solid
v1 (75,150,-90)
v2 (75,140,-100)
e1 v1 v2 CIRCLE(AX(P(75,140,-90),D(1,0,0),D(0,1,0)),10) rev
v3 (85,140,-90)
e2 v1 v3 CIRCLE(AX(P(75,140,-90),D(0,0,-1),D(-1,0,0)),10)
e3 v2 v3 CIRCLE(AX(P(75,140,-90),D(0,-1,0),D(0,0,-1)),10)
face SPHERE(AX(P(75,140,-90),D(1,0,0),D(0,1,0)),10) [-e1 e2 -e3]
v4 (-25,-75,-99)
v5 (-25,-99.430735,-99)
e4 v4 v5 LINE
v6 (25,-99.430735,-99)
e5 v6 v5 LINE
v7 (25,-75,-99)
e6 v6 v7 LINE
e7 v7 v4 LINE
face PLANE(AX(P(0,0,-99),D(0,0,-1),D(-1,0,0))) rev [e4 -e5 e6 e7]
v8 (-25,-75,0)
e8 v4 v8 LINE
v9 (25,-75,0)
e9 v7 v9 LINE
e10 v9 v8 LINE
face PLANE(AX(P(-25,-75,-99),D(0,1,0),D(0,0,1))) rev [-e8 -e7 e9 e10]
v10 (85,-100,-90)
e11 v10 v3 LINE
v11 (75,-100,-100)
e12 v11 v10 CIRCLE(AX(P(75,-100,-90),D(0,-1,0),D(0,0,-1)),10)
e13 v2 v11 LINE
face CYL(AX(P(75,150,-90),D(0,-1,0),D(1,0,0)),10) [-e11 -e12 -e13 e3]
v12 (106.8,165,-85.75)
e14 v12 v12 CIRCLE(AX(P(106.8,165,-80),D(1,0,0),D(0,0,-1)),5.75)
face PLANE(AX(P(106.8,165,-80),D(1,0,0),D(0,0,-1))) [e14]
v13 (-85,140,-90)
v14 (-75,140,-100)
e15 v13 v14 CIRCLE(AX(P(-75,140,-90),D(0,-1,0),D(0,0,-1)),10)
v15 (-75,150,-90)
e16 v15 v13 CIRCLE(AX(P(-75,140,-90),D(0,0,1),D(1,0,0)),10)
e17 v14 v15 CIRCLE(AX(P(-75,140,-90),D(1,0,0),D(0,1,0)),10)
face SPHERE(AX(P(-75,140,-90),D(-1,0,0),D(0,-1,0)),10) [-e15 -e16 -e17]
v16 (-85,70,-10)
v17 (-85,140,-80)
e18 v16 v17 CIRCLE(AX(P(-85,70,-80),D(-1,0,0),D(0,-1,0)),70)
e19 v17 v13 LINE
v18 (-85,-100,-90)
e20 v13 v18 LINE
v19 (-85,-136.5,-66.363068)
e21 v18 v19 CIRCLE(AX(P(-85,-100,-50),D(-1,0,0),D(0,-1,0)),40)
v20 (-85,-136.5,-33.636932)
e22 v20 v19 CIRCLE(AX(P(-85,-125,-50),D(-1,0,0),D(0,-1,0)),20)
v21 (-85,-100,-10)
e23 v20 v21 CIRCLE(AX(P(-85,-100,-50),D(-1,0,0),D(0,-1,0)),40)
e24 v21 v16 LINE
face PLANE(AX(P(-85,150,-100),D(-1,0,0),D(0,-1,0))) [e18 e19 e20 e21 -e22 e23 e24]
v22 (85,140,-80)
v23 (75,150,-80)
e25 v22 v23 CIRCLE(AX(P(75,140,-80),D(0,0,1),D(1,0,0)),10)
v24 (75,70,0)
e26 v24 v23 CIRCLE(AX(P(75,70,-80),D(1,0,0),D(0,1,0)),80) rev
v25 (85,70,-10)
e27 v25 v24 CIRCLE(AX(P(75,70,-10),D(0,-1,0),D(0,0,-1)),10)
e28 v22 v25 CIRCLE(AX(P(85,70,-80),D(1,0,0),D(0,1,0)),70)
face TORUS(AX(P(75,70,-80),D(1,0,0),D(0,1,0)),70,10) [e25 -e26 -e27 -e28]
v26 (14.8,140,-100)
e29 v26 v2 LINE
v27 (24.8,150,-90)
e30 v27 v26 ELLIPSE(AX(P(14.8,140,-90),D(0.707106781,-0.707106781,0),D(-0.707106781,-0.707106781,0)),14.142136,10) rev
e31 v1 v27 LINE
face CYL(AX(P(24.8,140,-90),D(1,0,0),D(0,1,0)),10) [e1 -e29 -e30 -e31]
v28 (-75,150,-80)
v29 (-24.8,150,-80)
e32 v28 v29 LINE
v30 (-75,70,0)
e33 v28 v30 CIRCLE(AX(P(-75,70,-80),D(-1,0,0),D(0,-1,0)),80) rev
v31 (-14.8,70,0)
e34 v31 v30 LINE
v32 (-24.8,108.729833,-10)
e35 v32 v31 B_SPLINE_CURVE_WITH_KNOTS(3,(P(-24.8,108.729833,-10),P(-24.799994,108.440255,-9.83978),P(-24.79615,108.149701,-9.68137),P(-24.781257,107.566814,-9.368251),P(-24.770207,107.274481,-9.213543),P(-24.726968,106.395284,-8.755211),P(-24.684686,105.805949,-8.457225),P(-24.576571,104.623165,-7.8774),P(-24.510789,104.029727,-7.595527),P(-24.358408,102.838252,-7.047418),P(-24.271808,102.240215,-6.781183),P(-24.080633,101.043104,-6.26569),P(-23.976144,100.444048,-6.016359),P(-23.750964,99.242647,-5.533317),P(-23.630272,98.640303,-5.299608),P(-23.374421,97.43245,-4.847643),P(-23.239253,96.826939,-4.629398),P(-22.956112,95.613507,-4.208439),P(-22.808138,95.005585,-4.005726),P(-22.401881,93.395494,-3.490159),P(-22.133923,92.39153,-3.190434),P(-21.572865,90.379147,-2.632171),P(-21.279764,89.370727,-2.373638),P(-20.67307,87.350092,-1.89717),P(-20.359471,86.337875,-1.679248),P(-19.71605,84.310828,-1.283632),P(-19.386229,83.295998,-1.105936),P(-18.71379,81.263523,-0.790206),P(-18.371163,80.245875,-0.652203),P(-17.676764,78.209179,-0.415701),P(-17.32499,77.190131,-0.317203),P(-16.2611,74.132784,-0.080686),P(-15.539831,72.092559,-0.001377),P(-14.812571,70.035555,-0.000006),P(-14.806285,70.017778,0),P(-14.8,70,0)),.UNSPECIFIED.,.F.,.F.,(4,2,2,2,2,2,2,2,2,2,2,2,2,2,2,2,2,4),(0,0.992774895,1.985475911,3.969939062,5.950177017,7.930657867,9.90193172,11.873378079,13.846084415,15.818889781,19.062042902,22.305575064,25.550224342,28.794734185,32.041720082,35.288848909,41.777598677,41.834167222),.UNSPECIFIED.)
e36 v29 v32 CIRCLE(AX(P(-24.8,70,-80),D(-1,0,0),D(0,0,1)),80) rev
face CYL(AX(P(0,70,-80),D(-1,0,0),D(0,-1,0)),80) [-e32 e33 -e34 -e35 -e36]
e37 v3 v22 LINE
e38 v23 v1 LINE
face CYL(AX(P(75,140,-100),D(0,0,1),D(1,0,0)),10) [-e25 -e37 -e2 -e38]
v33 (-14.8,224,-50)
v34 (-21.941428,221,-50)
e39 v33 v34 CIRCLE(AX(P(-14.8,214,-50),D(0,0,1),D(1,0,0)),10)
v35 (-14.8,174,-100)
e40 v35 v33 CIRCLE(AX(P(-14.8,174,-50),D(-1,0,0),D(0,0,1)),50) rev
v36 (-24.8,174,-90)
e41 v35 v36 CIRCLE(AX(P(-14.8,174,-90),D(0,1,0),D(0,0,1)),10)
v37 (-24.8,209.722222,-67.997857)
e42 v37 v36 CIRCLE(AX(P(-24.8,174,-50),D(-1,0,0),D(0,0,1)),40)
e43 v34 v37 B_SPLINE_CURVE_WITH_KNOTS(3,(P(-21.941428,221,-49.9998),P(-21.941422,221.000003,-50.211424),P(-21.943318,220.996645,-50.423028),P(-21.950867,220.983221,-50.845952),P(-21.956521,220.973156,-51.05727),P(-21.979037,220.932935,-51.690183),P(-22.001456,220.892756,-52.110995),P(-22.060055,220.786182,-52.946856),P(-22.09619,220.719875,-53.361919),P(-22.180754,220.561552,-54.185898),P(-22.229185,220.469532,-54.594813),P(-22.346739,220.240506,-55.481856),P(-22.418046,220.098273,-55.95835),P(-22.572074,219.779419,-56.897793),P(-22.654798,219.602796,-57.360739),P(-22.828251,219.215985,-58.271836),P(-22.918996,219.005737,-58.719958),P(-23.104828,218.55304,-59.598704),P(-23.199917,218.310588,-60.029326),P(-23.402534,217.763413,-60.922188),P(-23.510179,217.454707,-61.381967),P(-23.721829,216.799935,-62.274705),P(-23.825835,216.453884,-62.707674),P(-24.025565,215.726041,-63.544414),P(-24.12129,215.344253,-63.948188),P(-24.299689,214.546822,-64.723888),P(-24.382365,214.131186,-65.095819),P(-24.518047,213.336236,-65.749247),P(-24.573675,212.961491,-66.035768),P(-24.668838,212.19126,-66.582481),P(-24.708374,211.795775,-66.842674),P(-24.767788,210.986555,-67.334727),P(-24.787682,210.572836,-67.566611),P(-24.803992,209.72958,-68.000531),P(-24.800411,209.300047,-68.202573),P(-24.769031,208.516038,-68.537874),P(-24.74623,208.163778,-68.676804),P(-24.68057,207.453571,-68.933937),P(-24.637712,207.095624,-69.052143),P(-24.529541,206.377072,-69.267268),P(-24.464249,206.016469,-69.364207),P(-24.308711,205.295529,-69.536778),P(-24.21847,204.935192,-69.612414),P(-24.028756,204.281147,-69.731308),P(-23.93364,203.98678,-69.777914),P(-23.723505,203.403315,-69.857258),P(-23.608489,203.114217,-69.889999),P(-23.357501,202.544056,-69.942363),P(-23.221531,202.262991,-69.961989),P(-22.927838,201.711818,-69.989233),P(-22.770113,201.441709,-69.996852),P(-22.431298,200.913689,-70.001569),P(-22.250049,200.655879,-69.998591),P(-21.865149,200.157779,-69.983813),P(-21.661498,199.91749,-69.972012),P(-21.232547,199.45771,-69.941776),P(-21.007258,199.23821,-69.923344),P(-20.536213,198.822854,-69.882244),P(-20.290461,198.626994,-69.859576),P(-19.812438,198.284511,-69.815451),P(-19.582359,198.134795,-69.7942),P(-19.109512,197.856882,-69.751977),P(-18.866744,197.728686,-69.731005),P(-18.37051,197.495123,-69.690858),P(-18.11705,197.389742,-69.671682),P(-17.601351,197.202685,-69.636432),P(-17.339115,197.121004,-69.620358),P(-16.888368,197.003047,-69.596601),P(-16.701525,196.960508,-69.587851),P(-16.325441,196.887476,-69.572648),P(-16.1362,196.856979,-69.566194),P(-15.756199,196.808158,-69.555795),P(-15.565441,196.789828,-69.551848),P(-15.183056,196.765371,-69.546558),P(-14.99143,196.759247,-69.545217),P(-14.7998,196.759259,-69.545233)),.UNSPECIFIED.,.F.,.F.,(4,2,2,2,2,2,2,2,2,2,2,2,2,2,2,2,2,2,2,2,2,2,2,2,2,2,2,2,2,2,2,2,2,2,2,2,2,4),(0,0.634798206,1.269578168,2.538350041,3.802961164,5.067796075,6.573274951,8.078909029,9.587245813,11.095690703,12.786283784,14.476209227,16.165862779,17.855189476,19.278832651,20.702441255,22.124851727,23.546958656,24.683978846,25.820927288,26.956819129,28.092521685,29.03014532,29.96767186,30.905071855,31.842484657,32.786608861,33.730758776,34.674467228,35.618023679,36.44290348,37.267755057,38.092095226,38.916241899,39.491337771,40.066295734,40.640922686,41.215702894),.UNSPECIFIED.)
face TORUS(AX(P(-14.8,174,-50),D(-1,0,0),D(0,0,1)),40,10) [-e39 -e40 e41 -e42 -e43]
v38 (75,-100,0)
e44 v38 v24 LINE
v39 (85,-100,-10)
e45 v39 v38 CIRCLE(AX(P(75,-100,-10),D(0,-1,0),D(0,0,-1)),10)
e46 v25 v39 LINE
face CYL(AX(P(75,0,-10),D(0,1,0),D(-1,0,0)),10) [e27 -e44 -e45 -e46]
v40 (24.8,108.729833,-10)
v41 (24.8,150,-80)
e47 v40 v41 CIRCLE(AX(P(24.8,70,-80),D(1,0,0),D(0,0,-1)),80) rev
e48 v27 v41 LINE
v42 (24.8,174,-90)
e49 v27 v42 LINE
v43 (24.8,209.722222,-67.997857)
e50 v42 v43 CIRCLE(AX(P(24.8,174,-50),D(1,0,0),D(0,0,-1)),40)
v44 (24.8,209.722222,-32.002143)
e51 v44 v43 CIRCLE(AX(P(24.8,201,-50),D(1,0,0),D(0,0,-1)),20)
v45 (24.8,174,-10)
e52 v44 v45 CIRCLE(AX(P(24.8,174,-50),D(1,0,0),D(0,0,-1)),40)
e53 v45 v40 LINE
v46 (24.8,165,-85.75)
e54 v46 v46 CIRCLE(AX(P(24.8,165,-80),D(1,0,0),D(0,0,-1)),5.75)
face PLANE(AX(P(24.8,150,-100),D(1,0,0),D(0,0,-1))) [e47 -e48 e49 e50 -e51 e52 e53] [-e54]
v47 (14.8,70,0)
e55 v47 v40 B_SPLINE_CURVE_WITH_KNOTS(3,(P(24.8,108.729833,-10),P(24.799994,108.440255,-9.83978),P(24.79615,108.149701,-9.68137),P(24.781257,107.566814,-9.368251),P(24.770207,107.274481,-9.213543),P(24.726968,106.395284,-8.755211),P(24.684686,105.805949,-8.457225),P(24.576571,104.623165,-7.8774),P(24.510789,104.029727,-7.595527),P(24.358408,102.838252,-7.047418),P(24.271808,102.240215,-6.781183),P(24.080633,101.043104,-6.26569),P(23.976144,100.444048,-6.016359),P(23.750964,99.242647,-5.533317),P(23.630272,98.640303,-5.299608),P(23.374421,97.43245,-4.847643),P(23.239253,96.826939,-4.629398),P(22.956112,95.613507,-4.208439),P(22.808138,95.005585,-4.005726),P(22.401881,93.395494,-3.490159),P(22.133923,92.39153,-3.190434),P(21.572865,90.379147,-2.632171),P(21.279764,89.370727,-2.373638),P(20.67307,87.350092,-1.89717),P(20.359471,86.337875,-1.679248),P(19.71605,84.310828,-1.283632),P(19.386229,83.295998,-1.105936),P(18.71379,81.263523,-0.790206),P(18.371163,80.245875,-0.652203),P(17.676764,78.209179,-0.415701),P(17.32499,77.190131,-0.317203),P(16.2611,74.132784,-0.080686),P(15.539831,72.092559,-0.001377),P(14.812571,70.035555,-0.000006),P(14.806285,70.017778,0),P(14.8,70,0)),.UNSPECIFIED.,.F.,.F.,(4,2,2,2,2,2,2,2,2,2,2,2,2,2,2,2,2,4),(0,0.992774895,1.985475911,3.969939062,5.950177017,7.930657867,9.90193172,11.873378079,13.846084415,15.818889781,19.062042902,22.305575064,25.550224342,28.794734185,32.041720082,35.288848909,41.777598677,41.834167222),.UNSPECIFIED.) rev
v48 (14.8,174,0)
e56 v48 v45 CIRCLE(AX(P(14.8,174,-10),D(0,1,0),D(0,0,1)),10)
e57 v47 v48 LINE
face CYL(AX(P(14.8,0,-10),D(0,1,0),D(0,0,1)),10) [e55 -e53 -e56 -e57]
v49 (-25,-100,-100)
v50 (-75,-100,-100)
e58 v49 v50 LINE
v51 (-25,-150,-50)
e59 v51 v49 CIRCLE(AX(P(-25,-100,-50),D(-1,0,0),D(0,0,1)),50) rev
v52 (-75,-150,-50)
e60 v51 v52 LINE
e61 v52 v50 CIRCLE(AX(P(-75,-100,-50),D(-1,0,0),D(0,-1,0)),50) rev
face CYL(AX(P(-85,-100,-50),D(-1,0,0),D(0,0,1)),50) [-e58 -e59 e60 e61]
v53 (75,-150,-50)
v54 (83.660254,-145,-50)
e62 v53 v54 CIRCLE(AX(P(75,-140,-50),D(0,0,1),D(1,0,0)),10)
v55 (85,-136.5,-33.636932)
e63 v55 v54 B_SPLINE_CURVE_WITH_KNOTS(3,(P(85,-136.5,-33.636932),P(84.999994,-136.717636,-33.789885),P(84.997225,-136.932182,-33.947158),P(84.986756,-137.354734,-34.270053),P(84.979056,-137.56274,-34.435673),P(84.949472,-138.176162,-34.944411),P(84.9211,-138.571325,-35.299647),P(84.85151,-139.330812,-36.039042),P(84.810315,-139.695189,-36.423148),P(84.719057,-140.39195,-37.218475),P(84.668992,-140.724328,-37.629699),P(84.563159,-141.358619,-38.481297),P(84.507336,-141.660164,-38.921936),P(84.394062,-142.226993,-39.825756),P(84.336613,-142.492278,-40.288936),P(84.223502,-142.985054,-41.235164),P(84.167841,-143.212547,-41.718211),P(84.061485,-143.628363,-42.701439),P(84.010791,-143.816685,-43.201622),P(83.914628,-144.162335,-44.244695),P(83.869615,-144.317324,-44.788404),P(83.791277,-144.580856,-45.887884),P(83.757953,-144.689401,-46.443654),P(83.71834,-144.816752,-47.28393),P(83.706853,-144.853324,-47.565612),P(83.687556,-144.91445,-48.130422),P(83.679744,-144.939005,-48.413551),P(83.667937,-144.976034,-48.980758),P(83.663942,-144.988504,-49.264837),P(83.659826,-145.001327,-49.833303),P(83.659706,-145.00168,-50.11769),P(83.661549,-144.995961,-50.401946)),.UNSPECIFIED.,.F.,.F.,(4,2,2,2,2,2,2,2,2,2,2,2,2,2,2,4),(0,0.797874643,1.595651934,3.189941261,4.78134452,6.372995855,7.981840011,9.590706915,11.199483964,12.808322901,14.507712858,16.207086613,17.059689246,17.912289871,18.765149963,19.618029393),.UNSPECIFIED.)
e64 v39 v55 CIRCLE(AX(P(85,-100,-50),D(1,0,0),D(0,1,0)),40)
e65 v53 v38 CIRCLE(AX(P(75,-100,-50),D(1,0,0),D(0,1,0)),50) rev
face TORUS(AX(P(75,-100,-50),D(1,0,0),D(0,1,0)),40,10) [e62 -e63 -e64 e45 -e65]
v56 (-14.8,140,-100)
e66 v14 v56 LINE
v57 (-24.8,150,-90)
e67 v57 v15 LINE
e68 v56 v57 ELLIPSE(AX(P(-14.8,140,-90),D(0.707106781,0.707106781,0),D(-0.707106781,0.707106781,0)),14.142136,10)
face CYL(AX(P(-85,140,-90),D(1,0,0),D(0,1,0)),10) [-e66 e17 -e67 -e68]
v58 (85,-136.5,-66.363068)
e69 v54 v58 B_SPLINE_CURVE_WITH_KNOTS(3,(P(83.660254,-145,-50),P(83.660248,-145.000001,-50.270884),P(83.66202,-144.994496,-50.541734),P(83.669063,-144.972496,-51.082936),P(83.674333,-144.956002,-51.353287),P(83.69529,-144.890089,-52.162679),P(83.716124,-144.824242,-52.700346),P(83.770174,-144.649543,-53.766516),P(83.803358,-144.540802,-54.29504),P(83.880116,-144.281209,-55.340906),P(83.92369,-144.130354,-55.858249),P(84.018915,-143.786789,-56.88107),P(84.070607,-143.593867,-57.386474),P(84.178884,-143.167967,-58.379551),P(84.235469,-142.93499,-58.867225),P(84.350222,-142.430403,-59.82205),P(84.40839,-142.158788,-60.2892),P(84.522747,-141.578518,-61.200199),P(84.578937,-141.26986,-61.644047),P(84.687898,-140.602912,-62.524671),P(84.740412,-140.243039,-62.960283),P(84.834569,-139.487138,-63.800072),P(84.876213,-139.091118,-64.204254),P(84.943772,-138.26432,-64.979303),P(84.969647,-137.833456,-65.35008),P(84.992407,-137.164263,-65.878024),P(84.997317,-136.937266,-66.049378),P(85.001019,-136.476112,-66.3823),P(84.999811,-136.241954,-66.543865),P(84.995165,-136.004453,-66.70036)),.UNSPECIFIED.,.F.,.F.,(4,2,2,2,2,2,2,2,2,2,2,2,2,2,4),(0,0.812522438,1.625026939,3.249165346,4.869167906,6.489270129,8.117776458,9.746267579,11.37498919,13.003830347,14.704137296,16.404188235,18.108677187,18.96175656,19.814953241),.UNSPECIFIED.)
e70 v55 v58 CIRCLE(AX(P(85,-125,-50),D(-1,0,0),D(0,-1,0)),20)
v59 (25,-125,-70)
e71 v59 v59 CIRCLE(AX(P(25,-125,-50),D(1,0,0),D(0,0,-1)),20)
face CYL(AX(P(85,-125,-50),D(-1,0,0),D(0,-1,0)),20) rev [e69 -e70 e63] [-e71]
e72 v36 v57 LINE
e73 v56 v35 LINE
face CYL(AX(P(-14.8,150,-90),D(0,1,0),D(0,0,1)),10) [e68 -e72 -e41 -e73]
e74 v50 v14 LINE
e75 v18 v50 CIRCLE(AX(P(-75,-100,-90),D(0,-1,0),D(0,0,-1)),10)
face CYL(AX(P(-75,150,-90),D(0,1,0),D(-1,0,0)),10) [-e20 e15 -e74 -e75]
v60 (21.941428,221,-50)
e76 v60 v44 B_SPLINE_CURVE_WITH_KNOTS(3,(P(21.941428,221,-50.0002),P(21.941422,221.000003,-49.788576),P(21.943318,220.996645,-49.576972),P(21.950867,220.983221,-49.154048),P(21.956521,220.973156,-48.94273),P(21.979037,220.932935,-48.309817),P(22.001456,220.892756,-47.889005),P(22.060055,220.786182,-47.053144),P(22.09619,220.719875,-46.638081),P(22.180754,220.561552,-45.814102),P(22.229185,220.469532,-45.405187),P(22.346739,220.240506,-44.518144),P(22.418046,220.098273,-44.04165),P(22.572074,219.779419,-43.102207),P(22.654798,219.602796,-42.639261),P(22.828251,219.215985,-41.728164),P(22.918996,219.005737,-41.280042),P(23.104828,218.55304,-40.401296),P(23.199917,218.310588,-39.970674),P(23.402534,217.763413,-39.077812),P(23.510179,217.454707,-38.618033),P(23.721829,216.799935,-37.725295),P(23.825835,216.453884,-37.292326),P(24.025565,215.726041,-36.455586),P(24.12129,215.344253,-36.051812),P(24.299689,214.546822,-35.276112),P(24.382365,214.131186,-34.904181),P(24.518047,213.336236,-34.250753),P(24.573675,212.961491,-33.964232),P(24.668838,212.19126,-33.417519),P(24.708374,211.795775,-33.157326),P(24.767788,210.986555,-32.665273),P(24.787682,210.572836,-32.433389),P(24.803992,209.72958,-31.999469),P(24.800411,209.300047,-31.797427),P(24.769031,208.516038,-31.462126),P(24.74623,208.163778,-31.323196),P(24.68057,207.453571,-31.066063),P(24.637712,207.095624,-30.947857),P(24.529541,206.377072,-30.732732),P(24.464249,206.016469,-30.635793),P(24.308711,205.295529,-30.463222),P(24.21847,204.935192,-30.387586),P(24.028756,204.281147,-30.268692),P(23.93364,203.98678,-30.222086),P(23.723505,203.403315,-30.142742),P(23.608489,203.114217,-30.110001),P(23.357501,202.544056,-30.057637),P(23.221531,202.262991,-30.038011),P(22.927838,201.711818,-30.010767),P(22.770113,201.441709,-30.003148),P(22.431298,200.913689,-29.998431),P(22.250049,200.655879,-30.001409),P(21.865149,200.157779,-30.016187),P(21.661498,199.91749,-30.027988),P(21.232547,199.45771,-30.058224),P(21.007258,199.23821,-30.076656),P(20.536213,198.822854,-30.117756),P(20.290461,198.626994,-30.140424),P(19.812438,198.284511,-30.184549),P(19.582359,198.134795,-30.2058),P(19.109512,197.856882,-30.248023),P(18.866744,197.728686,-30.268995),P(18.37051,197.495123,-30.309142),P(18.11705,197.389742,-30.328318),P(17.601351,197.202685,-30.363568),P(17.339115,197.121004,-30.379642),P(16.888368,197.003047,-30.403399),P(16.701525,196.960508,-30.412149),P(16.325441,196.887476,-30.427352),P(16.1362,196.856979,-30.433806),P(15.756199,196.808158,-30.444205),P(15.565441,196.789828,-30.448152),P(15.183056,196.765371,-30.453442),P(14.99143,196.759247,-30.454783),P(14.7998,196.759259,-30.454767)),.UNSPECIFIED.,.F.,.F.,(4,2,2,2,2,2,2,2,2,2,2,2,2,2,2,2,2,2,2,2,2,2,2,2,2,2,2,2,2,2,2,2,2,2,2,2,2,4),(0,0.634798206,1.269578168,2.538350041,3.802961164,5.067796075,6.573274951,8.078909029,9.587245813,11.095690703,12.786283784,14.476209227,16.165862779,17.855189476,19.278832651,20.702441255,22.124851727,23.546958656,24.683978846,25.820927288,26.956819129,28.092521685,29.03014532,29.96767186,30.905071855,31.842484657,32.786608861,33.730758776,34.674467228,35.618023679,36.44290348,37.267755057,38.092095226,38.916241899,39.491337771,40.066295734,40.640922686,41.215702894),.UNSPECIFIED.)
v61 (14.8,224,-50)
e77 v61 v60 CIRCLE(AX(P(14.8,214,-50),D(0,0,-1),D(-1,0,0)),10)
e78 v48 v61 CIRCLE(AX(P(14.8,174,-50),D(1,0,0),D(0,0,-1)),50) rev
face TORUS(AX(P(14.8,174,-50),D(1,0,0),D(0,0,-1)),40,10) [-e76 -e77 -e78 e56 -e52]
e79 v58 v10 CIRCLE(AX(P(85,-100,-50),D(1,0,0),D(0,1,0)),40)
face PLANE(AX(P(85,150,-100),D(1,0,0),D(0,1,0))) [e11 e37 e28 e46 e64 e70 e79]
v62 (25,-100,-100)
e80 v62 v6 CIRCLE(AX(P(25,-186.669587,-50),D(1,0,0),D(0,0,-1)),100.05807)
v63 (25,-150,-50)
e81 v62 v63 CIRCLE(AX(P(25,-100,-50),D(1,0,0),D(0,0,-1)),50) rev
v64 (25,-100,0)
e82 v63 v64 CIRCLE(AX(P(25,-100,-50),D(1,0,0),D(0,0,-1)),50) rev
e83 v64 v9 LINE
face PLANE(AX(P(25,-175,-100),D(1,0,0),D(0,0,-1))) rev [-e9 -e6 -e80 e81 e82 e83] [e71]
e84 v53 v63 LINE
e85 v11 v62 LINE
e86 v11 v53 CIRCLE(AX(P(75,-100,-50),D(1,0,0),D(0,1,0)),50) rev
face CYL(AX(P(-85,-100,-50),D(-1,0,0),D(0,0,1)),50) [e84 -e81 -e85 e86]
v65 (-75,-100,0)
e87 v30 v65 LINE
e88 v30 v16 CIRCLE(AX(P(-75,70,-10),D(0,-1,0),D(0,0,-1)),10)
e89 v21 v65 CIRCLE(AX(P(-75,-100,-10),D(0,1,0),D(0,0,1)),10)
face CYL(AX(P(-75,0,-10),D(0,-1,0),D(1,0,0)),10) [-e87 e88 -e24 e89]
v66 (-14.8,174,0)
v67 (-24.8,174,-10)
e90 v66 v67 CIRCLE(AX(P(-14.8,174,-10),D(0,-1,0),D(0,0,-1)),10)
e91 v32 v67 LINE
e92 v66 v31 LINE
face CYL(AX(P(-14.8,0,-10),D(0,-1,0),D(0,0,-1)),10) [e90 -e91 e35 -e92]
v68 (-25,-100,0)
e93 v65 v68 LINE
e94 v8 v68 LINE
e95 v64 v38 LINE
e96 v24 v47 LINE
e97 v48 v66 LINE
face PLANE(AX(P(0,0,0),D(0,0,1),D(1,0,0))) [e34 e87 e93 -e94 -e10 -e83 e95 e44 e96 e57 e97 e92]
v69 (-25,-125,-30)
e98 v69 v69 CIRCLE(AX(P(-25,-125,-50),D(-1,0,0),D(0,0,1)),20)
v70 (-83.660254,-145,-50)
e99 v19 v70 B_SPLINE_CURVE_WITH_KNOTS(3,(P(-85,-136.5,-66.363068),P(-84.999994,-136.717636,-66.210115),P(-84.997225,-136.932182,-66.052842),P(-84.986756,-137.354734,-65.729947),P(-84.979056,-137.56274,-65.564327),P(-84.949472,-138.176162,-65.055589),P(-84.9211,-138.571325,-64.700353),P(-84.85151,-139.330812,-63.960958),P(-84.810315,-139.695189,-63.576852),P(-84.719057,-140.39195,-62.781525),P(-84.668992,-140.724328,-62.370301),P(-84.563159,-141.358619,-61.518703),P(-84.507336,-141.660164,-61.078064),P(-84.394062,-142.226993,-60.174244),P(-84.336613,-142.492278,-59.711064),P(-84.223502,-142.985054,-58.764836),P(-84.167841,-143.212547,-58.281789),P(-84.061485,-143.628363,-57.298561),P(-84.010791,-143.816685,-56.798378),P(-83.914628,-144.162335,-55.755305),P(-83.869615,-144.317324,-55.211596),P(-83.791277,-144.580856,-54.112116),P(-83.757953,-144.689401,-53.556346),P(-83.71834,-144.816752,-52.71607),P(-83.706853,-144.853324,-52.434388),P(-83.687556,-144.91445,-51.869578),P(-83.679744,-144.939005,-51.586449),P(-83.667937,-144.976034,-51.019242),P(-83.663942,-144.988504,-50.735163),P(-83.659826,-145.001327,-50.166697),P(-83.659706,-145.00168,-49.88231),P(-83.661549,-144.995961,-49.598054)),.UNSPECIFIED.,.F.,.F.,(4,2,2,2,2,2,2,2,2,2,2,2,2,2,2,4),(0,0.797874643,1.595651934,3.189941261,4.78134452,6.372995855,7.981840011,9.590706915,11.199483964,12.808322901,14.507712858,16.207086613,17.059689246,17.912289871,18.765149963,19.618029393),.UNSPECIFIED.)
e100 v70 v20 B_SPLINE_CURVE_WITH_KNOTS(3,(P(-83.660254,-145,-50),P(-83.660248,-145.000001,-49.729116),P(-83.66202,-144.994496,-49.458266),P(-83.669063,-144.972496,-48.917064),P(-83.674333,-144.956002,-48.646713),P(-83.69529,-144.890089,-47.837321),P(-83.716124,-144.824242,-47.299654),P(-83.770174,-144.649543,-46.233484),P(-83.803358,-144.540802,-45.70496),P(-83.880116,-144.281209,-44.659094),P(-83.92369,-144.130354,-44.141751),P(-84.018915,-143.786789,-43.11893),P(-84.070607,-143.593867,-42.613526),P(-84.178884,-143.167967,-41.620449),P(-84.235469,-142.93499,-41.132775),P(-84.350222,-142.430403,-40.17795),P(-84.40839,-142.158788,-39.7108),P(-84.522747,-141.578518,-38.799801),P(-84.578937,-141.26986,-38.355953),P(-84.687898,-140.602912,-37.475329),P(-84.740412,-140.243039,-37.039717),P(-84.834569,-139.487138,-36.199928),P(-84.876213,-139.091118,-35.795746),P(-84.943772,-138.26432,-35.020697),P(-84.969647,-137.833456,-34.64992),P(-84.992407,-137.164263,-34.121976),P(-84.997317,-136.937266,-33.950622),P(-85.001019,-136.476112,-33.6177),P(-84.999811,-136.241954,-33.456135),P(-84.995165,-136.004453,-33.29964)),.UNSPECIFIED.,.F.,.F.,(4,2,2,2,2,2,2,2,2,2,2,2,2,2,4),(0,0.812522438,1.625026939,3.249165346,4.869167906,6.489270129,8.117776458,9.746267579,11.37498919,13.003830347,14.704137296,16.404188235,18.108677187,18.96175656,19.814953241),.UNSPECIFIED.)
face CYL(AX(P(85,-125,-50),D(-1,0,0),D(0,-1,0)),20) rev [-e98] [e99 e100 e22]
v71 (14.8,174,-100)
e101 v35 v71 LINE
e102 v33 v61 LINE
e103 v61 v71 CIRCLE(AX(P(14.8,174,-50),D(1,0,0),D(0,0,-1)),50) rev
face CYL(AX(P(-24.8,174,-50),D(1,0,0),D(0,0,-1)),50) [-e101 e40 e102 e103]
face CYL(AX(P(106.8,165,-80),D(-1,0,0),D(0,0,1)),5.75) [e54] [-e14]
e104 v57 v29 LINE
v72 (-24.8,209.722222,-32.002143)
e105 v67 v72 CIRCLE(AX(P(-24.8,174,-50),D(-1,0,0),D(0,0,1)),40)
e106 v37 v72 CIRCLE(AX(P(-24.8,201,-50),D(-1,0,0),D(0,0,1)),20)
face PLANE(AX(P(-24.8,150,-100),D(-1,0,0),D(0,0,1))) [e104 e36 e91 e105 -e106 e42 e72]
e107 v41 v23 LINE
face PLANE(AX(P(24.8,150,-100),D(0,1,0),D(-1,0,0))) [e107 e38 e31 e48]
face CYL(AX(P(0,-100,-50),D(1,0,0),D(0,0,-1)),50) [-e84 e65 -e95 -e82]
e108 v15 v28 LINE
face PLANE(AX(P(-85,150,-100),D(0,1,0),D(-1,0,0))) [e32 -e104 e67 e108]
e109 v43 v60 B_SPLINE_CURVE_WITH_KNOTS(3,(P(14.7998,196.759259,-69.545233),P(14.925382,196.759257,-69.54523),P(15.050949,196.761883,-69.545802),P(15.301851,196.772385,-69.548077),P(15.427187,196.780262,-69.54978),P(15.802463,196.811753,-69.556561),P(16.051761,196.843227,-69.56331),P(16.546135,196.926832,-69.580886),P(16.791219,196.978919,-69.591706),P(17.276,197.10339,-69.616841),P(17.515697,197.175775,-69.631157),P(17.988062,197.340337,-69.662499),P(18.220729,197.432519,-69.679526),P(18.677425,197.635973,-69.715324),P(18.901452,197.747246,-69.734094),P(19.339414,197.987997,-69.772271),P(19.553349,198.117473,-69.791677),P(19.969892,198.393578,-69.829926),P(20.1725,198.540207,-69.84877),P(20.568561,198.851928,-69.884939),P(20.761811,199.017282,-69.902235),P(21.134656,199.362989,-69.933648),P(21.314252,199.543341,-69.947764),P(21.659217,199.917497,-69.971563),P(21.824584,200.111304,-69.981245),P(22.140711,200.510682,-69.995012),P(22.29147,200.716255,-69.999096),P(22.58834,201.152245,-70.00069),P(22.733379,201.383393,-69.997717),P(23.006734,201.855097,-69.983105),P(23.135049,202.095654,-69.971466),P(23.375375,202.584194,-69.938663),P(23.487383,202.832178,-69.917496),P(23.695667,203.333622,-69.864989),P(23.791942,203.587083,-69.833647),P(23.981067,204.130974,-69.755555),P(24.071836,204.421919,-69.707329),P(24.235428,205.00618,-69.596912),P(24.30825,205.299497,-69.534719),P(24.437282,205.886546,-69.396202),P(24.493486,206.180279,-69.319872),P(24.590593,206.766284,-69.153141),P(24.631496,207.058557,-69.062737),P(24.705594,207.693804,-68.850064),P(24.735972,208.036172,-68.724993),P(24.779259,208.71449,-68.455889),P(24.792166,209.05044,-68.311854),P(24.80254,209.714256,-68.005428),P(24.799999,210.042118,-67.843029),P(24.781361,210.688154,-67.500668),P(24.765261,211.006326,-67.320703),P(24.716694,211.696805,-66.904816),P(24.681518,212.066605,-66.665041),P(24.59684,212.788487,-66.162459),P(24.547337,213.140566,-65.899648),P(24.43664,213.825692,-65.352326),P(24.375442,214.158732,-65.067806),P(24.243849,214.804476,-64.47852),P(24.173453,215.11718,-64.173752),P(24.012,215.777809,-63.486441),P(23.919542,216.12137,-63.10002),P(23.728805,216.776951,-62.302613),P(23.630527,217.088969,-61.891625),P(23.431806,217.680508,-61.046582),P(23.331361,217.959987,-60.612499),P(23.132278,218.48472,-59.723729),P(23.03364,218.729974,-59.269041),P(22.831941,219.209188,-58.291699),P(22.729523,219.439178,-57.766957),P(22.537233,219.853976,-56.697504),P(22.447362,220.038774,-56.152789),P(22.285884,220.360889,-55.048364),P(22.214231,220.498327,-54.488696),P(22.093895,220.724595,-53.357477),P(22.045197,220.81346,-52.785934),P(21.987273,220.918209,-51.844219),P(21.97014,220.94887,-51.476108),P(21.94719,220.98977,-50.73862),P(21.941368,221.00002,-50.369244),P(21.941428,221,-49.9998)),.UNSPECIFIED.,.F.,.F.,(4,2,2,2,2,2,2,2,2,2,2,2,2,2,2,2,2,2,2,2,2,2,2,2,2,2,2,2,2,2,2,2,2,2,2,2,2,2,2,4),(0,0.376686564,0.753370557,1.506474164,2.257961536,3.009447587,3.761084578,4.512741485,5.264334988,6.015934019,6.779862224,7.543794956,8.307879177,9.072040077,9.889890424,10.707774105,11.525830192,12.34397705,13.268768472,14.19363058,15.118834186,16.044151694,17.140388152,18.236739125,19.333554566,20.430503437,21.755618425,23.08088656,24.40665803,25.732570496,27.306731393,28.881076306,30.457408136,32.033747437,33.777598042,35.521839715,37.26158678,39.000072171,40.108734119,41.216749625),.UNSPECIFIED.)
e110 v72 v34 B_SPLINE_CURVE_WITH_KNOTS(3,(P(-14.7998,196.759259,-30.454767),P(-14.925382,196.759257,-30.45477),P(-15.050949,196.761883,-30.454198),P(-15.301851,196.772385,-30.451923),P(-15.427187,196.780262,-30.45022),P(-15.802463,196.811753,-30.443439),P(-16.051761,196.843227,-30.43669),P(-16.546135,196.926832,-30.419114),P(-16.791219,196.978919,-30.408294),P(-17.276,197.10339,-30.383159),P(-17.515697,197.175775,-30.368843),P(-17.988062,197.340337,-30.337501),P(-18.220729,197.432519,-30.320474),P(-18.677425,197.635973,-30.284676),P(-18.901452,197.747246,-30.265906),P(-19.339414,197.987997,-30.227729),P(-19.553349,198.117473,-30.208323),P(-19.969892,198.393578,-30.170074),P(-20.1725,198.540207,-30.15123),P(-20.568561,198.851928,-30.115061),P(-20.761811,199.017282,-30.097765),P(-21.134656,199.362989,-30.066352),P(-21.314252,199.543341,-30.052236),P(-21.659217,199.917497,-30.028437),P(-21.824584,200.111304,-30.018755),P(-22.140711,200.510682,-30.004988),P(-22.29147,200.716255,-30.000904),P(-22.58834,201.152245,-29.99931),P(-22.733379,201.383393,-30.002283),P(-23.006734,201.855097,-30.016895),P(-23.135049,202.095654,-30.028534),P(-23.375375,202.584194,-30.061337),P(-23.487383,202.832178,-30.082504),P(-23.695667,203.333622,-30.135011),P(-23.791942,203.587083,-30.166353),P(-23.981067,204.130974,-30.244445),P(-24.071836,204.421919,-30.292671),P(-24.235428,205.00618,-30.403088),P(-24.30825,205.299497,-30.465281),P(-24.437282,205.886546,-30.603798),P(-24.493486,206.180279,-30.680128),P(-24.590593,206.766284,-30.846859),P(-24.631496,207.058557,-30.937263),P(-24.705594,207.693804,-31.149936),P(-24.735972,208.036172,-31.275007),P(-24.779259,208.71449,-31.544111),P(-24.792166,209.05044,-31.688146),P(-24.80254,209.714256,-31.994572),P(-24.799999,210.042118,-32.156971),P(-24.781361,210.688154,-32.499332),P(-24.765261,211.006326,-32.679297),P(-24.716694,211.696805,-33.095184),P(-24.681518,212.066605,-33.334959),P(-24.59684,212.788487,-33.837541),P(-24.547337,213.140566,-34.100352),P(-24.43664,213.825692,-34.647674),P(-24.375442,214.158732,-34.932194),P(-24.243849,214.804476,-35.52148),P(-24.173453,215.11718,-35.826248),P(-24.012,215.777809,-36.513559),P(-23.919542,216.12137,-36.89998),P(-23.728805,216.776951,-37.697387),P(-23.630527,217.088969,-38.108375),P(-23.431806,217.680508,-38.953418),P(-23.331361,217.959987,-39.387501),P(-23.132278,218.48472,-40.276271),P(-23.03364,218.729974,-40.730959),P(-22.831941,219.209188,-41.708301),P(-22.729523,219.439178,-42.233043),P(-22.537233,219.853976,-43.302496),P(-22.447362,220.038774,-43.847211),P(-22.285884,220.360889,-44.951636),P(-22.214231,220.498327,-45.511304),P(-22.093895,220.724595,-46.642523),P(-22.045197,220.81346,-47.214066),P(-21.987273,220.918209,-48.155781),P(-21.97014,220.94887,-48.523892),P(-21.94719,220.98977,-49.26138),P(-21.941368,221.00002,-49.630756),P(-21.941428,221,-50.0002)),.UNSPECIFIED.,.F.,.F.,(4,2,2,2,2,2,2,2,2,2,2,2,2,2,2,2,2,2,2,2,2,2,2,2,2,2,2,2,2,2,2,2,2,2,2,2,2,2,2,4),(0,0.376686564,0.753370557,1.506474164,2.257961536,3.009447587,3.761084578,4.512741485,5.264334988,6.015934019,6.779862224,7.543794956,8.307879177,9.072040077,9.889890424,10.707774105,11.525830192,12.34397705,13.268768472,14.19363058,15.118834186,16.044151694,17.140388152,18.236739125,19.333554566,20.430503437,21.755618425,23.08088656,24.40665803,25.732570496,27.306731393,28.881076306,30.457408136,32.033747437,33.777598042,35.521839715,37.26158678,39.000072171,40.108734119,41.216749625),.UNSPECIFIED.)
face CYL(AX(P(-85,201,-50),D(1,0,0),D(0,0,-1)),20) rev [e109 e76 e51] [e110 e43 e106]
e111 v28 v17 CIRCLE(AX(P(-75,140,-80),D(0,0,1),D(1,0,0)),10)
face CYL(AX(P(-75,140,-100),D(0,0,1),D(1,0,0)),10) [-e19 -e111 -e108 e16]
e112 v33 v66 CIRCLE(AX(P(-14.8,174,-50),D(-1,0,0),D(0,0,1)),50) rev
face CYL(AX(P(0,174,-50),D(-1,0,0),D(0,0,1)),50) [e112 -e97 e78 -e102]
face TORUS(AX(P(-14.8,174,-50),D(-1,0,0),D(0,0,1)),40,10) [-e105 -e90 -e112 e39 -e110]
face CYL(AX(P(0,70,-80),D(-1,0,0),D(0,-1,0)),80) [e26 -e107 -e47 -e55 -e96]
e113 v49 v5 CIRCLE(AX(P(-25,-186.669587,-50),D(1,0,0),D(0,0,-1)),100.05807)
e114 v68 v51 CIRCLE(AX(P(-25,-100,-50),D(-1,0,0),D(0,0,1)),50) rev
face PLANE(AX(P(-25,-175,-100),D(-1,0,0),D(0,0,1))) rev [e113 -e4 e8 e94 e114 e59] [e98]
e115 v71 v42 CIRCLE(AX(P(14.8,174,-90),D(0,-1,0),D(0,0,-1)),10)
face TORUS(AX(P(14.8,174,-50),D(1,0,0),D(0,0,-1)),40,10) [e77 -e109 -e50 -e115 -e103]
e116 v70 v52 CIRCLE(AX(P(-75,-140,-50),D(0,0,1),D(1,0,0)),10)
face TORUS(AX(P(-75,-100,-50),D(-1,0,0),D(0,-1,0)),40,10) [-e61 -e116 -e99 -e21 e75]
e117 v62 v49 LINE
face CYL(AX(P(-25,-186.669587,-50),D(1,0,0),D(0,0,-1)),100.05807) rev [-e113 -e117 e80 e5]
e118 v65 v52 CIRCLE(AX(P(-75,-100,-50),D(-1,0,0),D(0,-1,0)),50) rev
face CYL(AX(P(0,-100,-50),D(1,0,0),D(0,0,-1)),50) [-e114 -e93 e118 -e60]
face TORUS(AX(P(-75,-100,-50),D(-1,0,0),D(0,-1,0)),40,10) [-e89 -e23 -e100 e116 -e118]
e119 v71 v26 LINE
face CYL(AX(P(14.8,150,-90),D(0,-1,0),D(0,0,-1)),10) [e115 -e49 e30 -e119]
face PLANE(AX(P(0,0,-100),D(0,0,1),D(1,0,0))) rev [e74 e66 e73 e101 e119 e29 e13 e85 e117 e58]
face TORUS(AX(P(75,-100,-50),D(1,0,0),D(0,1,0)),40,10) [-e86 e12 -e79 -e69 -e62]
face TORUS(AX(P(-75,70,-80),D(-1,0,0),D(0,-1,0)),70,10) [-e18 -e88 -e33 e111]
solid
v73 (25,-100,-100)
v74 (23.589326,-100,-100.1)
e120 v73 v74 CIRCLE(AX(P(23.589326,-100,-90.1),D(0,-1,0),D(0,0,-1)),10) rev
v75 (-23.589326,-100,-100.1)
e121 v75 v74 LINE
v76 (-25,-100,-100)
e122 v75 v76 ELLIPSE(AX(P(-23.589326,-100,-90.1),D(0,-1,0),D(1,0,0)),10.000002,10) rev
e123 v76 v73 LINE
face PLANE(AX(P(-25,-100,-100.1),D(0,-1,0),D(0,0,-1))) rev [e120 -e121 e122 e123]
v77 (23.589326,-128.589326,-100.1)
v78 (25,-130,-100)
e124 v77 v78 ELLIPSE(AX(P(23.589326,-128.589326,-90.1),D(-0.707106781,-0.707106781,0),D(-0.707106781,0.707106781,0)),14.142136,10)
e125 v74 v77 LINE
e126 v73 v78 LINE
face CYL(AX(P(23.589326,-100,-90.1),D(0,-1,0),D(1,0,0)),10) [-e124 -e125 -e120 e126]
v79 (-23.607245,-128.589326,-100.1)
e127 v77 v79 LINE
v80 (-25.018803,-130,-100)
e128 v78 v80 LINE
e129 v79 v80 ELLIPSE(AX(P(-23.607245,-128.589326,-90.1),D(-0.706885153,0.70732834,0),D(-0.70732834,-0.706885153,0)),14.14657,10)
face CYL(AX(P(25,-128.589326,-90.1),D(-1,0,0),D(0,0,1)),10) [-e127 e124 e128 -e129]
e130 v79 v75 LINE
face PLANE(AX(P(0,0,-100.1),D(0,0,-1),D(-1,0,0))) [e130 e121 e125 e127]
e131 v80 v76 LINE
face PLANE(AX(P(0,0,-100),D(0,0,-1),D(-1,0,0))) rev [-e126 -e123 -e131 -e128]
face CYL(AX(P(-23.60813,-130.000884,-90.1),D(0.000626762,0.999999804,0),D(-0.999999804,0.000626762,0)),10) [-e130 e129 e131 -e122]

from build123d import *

# Parameters (mm, degrees)
BOSS_EXTRUDE1_DEPTH    = 100
SKETCH2_W              = 50
SKETCH2_H              = 50
CUT_EXTRUDE1_DEPTH     = 260.617025636
FILLET1_R              = 50
CUT_EXTRUDE2_DEPTH     = 25
SKETCH7_R              = 20
CUT_EXTRUDE3_DEPTH     = 299.456026912
FILLET2_R              = 50
CUT_EXTRUDE6_START     = -150
CUT_EXTRUDE6_OUTLINE_W = 50
CUT_EXTRUDE6_OUTLINE_H = 6.698729811
CUT_EXTRUDE6_DEPTH     = 50
CUT_EXTRUDE7_DEPTH     = 25
FILLET3_R              = 10
SKETCH11_W             = 50
SKETCH11_H             = 25
CUT_EXTRUDE8_DEPTH     = 99
BOSS_EXTRUDE7_DEPTH    = 0.1
FILLET4_R              = 10
SKETCH14_R             = 20
CUT_EXTRUDE9_DEPTH     = 269.797414422
SKETCH15_R             = 5.75
BOSS_EXTRUDE8_DEPTH    = 82
FILLET5_R              = 80
FILLET6_R              = 10


with BuildPart() as part:
    # Sketch1 → Boss-Extrude1 (new body)
    with BuildSketch(Plane.XY):
        Polygon((-24.8, 150), (-24.8, 224), (24.8, 224), (24.8, 150), (85, 150), (85, -150), (-85, -150), (-85, 150), align=None)
    extrude(amount=-BOSS_EXTRUDE1_DEPTH)

    # Sketch2 → Cut-Extrude1 (cut, through all)
    with BuildSketch(Plane.XY):
        with Locations((0, -150)):
            Rectangle(SKETCH2_W, SKETCH2_H)
    extrude(amount=-CUT_EXTRUDE1_DEPTH, mode=Mode.SUBTRACT)

    # Fillet1
    fillet1_edges = [part.edges().sort_by_distance(p)[0] for p in [
        (0, 224, -100),
        (0, 224, 0),
    ]]
    fillet(fillet1_edges, radius=FILLET1_R - 0.0001)  # a hair under: the kernel refuses the full size

    # Sketch6 → Cut-Extrude2 (cut, symmetric)
    with BuildSketch(Plane(origin=(0, 0, 0), x_dir=(0, 0, -1), z_dir=(1, 0, 0))):
        with BuildLine():
            Line((100, -125), (0, -125))
            ThreePointArc((0, -125), (50, -75), (100, -125))
        make_face()
    extrude(amount=CUT_EXTRUDE2_DEPTH, both=True, mode=Mode.SUBTRACT)

    # Sketch7 → Cut-Extrude3 (cut, through all)
    with BuildSketch(Plane.ZY.offset(85)):
        with Locations(Location((-50, -125, 0), (0, 0, 270))):
            Circle(SKETCH7_R)
    extrude(amount=-CUT_EXTRUDE3_DEPTH, mode=Mode.SUBTRACT)

    # Fillet2
    fillet2_edges = [part.edges().sort_by_distance(p)[0] for p in [
        (-55, -150, -100),
        (-55, -150, 0),
    ]]
    fillet(fillet2_edges, radius=FILLET2_R - 0.0001)  # a hair under: the kernel refuses the full size

    # Cut-Extrude6: read off the stored shape, not the designer's step
    # Cut-Extrude6 outline → Cut-Extrude6 (cut)
    with BuildSketch(Plane(origin=(0, 0, 0), x_dir=(1, 0, 0), z_dir=(0, 1, 0)).offset(CUT_EXTRUDE6_START)):
        with Locations((0, 96.650635095)):
            Rectangle(CUT_EXTRUDE6_OUTLINE_W, CUT_EXTRUDE6_OUTLINE_H)
        with Locations((0, 3.349364906)):
            Rectangle(CUT_EXTRUDE6_OUTLINE_W, CUT_EXTRUDE6_OUTLINE_H)
    extrude(amount=CUT_EXTRUDE6_DEPTH, mode=Mode.SUBTRACT)

    # Sketch10 → Cut-Extrude7 (cut, symmetric)
    with BuildSketch(Plane(origin=(0, 0, 0), x_dir=(0, 0, -1), z_dir=(1, 0, 0))):
        with BuildLine():
            Line((0, -100), (100, -100))
            ThreePointArc((100, -100), (50, -86.611517322), (0, -100))
        make_face()
    extrude(amount=CUT_EXTRUDE7_DEPTH, both=True, mode=Mode.SUBTRACT)

    # Fillet3
    fillet3_edges = [part.edges().sort_by_distance(p)[0] for p in [
        (24.8, 162.00005, -100),
        (-54.9, 150, -100),
        (-24.8, 162.00005, 0),
        (-24.8, 162.00005, -100),
        (-24.8, 209.355368349, -14.644631651),
        (-24.8, 209.355368349, -85.355368349),
        (24.8, 209.355368349, -14.644631651),
        (24.8, 209.355368349, -85.355368349),
        (54.9, 150, -100),
        (24.8, 162.00005, 0),
    ]]
    fillet(fillet3_edges, radius=FILLET3_R)

    # Sketch11 → Cut-Extrude8 (cut)
    with BuildSketch(Plane.XY):
        with Locations((0, -87.5)):
            Rectangle(SKETCH11_W, SKETCH11_H)
    extrude(amount=-CUT_EXTRUDE8_DEPTH, mode=Mode.SUBTRACT)

    # Sketch14 → Cut-Extrude9 (cut, through all)
    with BuildSketch(Plane(origin=(24.8, 0, 0), x_dir=(0, 0, -1), z_dir=(1, 0, 0))):
        with Locations(Location((50, 201, 0), (0, 0, 25.856016698))):
            Circle(SKETCH14_R)
    extrude(amount=-CUT_EXTRUDE9_DEPTH, mode=Mode.SUBTRACT)

    # Sketch15 → Boss-Extrude8 (add)
    with BuildSketch(Plane(origin=(24.8, 0, 0), x_dir=(0, 0, -1), z_dir=(1, 0, 0))):
        with Locations((80, 165)):
            Circle(SKETCH15_R)
    extrude(amount=BOSS_EXTRUDE8_DEPTH)

    # Fillet5
    fillet5_edges = [part.edges().sort_by_distance(p)[0] for p in [
        (-49.9, 150, 0),
        (49.9, 150, 0),
    ]]
    fillet(fillet5_edges, radius=FILLET5_R)

    # Fillet6
    # the kernel refuses this fillet: 10 mm, written as the material it takes off along each edge
    with BuildSketch(Plane(origin=(-85, -100.0001, -100), x_dir=(0, 0, 1), z_dir=(0, 1, 0)), Plane(origin=(85, 140, -100), x_dir=(0, 0, 1), z_dir=(0, -1, 0))) as fillet6_piece_1:
        with BuildLine():
            CenterArc((FILLET6_R, FILLET6_R), FILLET6_R, 180, 90)
            Line((0, FILLET6_R), (0, 0))
            Line((0, 0), (FILLET6_R, 0))
        make_face()
    extrude(amount=240.0001, mode=Mode.SUBTRACT)
    with BuildSketch(Plane(origin=(85, 150, -80), x_dir=(0, -1, 0), z_dir=(0, 0, -1))) as fillet6_piece_2:
        with BuildLine():
            CenterArc((FILLET6_R, FILLET6_R), FILLET6_R, 180, 90)
            Line((0, FILLET6_R), (0, 0))
            Line((0, 0), (FILLET6_R, 0))
        make_face()
    extrude(amount=10, mode=Mode.SUBTRACT)
    with BuildSketch(Plane(origin=(85, 140, -90), x_dir=(0, 1, 0), z_dir=(0, 0, 1))) as fillet6_piece_3:
        with BuildLine():
            CenterArc((10 - FILLET6_R, FILLET6_R), FILLET6_R, 270, 90)
            Line((10, FILLET6_R), (10, 0))
            Line((10, 0), (10 - FILLET6_R, 0))
        make_face()
    revolve(axis=Axis((85, 140, -90), (-1, 0, 0)), revolution_arc=90, mode=Mode.SUBTRACT)
    with BuildSketch(Plane(origin=(-85, 150, -80), x_dir=(0, -1, 0), z_dir=(0, 0, -1))) as fillet6_piece_4:
        with BuildLine():
            CenterArc((FILLET6_R, -FILLET6_R), FILLET6_R, 90, 90)
            Line((0, -FILLET6_R), (0, 0))
            Line((0, 0), (FILLET6_R, 0))
        make_face()
    extrude(amount=10, mode=Mode.SUBTRACT)
    with BuildSketch(Plane(origin=(-85, 140, -90), x_dir=(0, 1, 0), z_dir=(0, 0, 1))) as fillet6_piece_5:
        with BuildLine():
            CenterArc((10 - FILLET6_R, -FILLET6_R), FILLET6_R, 360, 90)
            Line((10, -FILLET6_R), (10, 0))
            Line((10, 0), (10 - FILLET6_R, 0))
        make_face()
    revolve(axis=Axis((-85, 140, -90), (-1, 0, 0)), revolution_arc=90, mode=Mode.SUBTRACT)
    with BuildSketch(Plane(origin=(-85, -100.0001, 0), x_dir=(1, 0, 0), z_dir=(0, 1, 0)), Plane(origin=(85, 70, 0), x_dir=(-1, 0, 0), z_dir=(0, -1, 0))) as fillet6_piece_6:
        with BuildLine():
            CenterArc((FILLET6_R, FILLET6_R), FILLET6_R, 180, 90)
            Line((0, FILLET6_R), (0, 0))
            Line((0, 0), (FILLET6_R, 0))
        make_face()
    extrude(amount=170.0001, mode=Mode.SUBTRACT)
    with BuildSketch(Plane(origin=(-85, 70, -80), x_dir=(0, 0, 1), z_dir=(0, -1, 0))) as fillet6_piece_7:
        with BuildLine():
            CenterArc((80 - FILLET6_R, -FILLET6_R), FILLET6_R, 0, 90)
            Line((80 - FILLET6_R, 0), (80, 0))
            Line((80, 0), (80, -FILLET6_R))
        make_face()
    revolve(axis=Axis((-85, 70, -80), (-1, 0, 0)), revolution_arc=90, mode=Mode.SUBTRACT)
    with BuildSketch(Plane(origin=(85, 70, -80), x_dir=(0, 0, 1), z_dir=(0, -1, 0))) as fillet6_piece_8:
        with BuildLine():
            CenterArc((80 - FILLET6_R, FILLET6_R), FILLET6_R, 270, 90)
            Line((80 - FILLET6_R, 0), (80, 0))
            Line((80, 0), (80, FILLET6_R))
        make_face()
    revolve(axis=Axis((85, 70, -80), (-1, 0, 0)), revolution_arc=90, mode=Mode.SUBTRACT)
    with BuildSketch(Plane(origin=(85, -100.0001, -49.9999), x_dir=(0, 0, 1), z_dir=(0, 1, 0))) as fillet6_piece_9:
        with BuildLine():
            CenterArc((49.9999 - FILLET6_R, -FILLET6_R), FILLET6_R, 360, 90)
            Line((49.9999, -FILLET6_R), (49.9999, 0))
            Line((49.9999, 0), (49.9999 - FILLET6_R, 0))
        make_face()
    revolve(axis=Axis((85, -100.0001, -49.9999), (1, 0, 0)), revolution_arc=90, mode=Mode.SUBTRACT)
    with BuildSketch(Plane(origin=(85, -100.0001, -50.0001), x_dir=(0, 0, -1), z_dir=(0, 1, 0))) as fillet6_piece_10:
        with BuildLine():
            CenterArc((49.9999 - FILLET6_R, FILLET6_R), FILLET6_R, 270, 90)
            Line((49.9999, FILLET6_R), (49.9999, 0))
            Line((49.9999, 0), (49.9999 - FILLET6_R, 0))
        make_face()
    revolve(axis=Axis((85, -100.0001, -50.0001), (-1, 0, 0)), revolution_arc=90, mode=Mode.SUBTRACT)
    with BuildSketch(Plane(origin=(-85, -100.0001, -49.9999), x_dir=(0, 0, 1), z_dir=(0, 1, 0))) as fillet6_piece_11:
        with BuildLine():
            CenterArc((49.9999 - FILLET6_R, FILLET6_R), FILLET6_R, 270, 90)
            Line((49.9999, FILLET6_R), (49.9999, 0))
            Line((49.9999, 0), (49.9999 - FILLET6_R, 0))
        make_face()
    revolve(axis=Axis((-85, -100.0001, -49.9999), (1, 0, 0)), revolution_arc=90, mode=Mode.SUBTRACT)
    with BuildSketch(Plane(origin=(-85, -100.0001, -50.0001), x_dir=(0, 0, -1), z_dir=(0, 1, 0))) as fillet6_piece_12:
        with BuildLine():
            CenterArc((49.9999 - FILLET6_R, -FILLET6_R), FILLET6_R, 0, 90)
            Line((49.9999, -FILLET6_R), (49.9999, 0))
            Line((49.9999, 0), (49.9999 - FILLET6_R, 0))
        make_face()
    revolve(axis=Axis((-85, -100.0001, -50.0001), (-1, 0, 0)), revolution_arc=90, mode=Mode.SUBTRACT)
    with BuildSketch(Plane(origin=(-85, -150, -49.9999), x_dir=(0, 1, 0), z_dir=(0, 0, -1))) as fillet6_piece_13:
        with BuildLine():
            CenterArc((FILLET6_R, FILLET6_R), FILLET6_R, 180, 90)
            Line((0, FILLET6_R), (0, 0))
            Line((0, 0), (FILLET6_R, 0))
        make_face()
    extrude(amount=0.0002, mode=Mode.SUBTRACT)
    with BuildSketch(Plane(origin=(85, -150, -49.9999), x_dir=(0, 1, 0), z_dir=(0, 0, -1))) as fillet6_piece_14:
        with BuildLine():
            CenterArc((FILLET6_R, -FILLET6_R), FILLET6_R, 90, 90)
            Line((0, -FILLET6_R), (0, 0))
            Line((0, 0), (FILLET6_R, 0))
        make_face()
    extrude(amount=0.0002, mode=Mode.SUBTRACT)


with BuildPart() as body_2:
    # Sketch13 → Boss-Extrude7 (new body)
    with BuildSketch(Plane(origin=(0, 0, -100), x_dir=(-1, 0, 0), z_dir=(0, 0, -1))):
        Polygon((-25, -100), (-25, -130), (25.018802851, -130), (25, -100), align=None)
    extrude(amount=BOSS_EXTRUDE7_DEPTH)

    # Fillet4
    # the kernel refuses this fillet: 10 mm, written as the material it takes off along each edge
    with BuildSketch(Plane(origin=(-25.021013242, -133.526683302, -100.1), x_dir=(0, 0, 1), z_dir=(0.0006267615930631998, 0.9999998035849335, 0))) as fillet4_piece_1:
        with BuildLine():
            CenterArc((10, 1.410673598), FILLET4_R, 180, 8.109614456)
            Line((0, 1.410673598), (0, 0))
            Line((0, 0), (0.1, 0))
        make_face()
    extrude(amount=37.053373882, mode=Mode.SUBTRACT)
    with BuildSketch(Plane(origin=(25, -96.473316005, -100.1), x_dir=(0, 0, 1), z_dir=(0, -1, 0))) as fillet4_piece_2:
        with BuildLine():
            CenterArc((10, 1.410673598), FILLET4_R, 180, 8.109614456)
            Line((0, 1.410673598), (0, 0))
            Line((0, 0), (0.1, 0))
        make_face()
    extrude(amount=37.05336799, mode=Mode.SUBTRACT)
    with BuildSketch(Plane(origin=(28.526683995, -130, -100.1), x_dir=(0, 0, 1), z_dir=(-1, 0, 0))) as fillet4_piece_3:
        with BuildLine():
            CenterArc((10, 1.410673598), FILLET4_R, 180, 8.109614456)
            Line((0, 1.410673598), (0, 0))
            Line((0, 0), (0.1, 0))
        make_face()
    extrude(amount=57.072170841, mode=Mode.SUBTRACT)


solid = Compound([part.part, body_2.part])
